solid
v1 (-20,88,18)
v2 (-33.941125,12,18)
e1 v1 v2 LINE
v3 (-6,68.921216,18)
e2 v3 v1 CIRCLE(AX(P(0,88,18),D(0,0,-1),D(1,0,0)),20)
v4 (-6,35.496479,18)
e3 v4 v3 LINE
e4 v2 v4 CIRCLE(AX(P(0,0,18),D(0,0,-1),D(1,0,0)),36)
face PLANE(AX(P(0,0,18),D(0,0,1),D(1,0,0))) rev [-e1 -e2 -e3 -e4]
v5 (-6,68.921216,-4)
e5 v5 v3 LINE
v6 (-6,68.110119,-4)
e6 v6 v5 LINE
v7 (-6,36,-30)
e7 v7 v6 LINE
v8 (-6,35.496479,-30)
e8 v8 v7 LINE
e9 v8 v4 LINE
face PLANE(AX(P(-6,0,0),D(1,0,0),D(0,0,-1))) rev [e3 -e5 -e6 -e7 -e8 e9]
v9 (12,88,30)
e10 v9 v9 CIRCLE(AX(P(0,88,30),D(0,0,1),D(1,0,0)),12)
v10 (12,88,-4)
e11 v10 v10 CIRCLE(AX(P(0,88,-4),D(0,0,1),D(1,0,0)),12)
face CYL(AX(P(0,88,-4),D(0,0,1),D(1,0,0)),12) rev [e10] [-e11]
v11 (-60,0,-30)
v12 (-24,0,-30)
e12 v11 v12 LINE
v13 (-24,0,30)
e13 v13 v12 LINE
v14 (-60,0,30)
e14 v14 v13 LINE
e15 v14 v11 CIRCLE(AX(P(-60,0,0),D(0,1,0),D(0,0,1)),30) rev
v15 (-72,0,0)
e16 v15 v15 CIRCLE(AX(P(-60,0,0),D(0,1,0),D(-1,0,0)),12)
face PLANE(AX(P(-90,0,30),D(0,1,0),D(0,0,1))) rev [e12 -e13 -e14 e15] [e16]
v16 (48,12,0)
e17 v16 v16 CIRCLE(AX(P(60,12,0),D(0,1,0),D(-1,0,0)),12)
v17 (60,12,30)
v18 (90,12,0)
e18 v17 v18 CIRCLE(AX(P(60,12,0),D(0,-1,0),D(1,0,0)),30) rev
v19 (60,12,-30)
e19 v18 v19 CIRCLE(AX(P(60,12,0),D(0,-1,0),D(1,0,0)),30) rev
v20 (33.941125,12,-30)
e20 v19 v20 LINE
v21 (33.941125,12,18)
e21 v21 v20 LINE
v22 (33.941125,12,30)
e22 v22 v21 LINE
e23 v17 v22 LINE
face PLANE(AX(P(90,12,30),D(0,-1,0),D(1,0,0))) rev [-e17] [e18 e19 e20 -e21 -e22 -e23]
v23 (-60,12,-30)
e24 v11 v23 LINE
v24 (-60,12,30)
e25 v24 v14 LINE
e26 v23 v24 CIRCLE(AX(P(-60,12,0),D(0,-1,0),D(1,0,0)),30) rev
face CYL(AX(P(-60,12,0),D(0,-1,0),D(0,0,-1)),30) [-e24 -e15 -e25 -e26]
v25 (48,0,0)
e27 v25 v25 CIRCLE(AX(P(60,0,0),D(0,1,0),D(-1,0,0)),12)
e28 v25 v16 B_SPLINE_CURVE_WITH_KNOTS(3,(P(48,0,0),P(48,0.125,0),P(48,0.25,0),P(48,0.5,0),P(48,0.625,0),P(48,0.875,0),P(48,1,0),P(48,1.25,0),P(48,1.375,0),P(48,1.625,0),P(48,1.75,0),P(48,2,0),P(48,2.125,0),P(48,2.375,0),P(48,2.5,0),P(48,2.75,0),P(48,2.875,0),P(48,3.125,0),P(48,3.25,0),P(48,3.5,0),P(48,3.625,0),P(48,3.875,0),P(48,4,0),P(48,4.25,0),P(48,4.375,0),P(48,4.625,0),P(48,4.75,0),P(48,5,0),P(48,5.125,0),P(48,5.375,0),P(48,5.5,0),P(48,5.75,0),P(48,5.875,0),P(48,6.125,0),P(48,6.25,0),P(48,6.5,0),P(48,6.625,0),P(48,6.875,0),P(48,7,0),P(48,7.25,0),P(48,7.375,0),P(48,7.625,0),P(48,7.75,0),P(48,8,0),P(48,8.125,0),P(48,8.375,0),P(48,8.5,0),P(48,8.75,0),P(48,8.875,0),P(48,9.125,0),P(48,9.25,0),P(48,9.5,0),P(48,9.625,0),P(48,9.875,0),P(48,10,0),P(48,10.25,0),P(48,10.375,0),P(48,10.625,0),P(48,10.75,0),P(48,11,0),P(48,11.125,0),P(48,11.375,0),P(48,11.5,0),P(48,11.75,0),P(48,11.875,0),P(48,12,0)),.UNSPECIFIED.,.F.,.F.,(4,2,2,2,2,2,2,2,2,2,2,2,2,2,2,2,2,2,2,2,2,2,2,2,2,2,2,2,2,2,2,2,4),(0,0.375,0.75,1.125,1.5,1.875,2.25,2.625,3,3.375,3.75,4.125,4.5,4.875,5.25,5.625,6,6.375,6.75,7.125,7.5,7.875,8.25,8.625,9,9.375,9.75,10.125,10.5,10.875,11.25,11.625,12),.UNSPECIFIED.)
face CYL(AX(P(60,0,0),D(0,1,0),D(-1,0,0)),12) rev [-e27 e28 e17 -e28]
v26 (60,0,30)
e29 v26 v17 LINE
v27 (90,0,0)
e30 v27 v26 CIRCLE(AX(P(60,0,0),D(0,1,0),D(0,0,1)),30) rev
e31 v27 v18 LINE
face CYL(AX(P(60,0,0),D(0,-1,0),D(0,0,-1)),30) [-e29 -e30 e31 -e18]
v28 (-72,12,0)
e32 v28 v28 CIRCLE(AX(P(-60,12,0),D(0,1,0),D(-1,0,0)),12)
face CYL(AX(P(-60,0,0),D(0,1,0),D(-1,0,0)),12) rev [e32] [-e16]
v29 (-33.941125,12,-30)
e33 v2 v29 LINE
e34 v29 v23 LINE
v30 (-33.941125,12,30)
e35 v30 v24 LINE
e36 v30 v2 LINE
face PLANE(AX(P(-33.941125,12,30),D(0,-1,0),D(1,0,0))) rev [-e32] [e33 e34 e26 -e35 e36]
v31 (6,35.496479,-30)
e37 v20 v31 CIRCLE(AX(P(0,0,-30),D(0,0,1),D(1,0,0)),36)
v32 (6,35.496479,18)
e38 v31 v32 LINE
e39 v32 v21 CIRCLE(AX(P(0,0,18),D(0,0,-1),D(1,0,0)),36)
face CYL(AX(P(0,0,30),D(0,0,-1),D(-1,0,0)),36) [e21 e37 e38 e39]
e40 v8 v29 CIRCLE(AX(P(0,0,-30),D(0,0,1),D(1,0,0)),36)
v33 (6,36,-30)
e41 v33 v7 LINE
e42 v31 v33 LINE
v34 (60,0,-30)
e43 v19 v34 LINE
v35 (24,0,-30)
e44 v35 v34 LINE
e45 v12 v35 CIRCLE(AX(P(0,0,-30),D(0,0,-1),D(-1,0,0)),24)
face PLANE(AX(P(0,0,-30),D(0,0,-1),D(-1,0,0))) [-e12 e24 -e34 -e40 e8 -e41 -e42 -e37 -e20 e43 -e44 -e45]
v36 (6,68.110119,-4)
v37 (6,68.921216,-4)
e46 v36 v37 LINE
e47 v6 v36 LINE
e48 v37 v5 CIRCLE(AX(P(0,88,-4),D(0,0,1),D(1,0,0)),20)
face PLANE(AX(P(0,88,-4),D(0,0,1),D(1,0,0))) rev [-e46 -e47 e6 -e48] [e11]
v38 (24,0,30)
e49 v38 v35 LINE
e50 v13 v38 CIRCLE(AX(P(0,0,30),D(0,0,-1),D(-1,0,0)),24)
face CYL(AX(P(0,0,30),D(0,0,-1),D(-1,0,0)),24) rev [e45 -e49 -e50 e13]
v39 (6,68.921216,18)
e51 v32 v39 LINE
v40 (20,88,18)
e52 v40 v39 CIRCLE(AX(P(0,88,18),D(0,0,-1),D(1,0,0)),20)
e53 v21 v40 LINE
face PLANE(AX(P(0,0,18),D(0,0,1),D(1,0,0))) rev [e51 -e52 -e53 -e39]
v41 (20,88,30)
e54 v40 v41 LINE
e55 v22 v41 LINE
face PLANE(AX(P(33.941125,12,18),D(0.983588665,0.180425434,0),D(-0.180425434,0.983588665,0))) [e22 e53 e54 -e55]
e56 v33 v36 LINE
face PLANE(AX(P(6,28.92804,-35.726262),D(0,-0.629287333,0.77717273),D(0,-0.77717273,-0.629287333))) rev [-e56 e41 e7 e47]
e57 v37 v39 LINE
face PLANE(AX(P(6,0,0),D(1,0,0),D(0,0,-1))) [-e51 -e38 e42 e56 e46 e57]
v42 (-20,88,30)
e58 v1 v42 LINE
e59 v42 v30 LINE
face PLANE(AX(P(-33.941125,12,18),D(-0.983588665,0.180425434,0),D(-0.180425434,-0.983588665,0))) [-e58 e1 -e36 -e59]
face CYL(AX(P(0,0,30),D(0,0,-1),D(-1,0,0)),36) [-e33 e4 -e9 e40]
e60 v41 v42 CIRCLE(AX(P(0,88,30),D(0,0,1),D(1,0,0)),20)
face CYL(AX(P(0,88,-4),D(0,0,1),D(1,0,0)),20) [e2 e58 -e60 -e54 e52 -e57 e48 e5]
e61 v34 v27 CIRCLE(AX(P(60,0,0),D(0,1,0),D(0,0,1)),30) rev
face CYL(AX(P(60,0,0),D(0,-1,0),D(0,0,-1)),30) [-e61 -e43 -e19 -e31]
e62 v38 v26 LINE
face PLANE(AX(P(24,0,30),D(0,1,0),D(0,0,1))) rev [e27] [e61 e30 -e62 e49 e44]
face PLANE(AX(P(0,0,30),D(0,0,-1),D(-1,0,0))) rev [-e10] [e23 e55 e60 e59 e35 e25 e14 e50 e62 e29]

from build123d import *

# Parameters (mm, degrees)
BOSS_EXTRUDE1_DEPTH = 30
FILLET1_R           = 30
FILLET2_R           = 30
SKETCH5_R           = 12
CUT_EXTRUDE1_DEPTH  = 98.857038582
FILLET3_RADIUS      = 30
FILLET3_LENGTH      = 12
SKETCH6_R           = 12
CUT_EXTRUDE2_DEPTH  = 98.857038582
SKETCH2_R           = 20
SKETCH2_R_2         = 12
BOSS_EXTRUDE2_DEPTH = 34
BOSS_EXTRUDE3_DEPTH = 12
BOSS_EXTRUDE4_DEPTH = 6


with BuildPart() as part:
    # Sketch1 → Boss-Extrude1 (new, symmetric)
    with BuildSketch(Plane.XY):
        with BuildLine():
            Line((-90, 0), (-24, 0))
            ThreePointArc((-24, 0), (0, 24), (24, 0))
            Line((24, 0), (90, 0))
            Line((90, 0), (90, 12))
            Line((90, 12), (33.941125497, 12))
            ThreePointArc((33.941125497, 12), (0, 36), (-33.941125497, 12))
            Line((-33.941125497, 12), (-90, 12))
            Line((-90, 12), (-90, 0))
        make_face()
    extrude(amount=BOSS_EXTRUDE1_DEPTH, both=True)

    # Fillet1
    fillet1_edges = [part.edges().sort_by_distance(p)[0] for p in [
        (90, 6, -30),
    ]]
    fillet(fillet1_edges, radius=FILLET1_R)

    # Fillet2
    fillet2_edges = [part.edges().sort_by_distance(p)[0] for p in [
        (90, 6, 30),
    ]]
    fillet(fillet2_edges, radius=FILLET2_R - 0.0001)  # a hair under: the kernel refuses the full size

    # Sketch5 → Cut-Extrude1 (cut, through all)
    with BuildSketch(Plane(origin=(0, 12, 0), x_dir=(1, 0, 0), z_dir=(0, 1, 0))):
        with Locations(Location((60, 0, 0), (0, 0, 180))):
            Circle(SKETCH5_R)
    extrude(amount=-CUT_EXTRUDE1_DEPTH, mode=Mode.SUBTRACT)

    # Fillet3: full round fillet: the end face becomes a half cylinder, R = half its width
    fillet3_face = Plane((-90, 6, 0), x_dir=(0, -1, 0), z_dir=(-1, 0, 0))  # on the end face: x along it, z out of the body
    fillet3_slab = fillet3_face.offset(-FILLET3_RADIUS / 2) * Box(FILLET3_LENGTH, 2 * FILLET3_RADIUS, FILLET3_RADIUS, mode=Mode.PRIVATE)  # the body's end, R deep
    fillet3_round = Plane((-60, 6, 0), x_dir=(-1, 0, 0), z_dir=(0, -1, 0)) * Cylinder(FILLET3_RADIUS, FILLET3_LENGTH, mode=Mode.PRIVATE)  # its axis R under the face
    add(fillet3_slab - fillet3_round, mode=Mode.SUBTRACT)

    # Sketch6 → Cut-Extrude2 (cut, through all)
    with BuildSketch(Plane(origin=(0, 12, 0), x_dir=(1, 0, 0), z_dir=(0, 1, 0))):
        with Locations(Location((-60, 0, 0), (0, 0, 180))):
            Circle(SKETCH6_R)
    extrude(amount=-CUT_EXTRUDE2_DEPTH, mode=Mode.SUBTRACT)



with BuildPart() as body_2:
    # Sketch2 → Boss-Extrude2 (new body)
    with BuildSketch(Plane.XY.offset(30)):
        with Locations((0, 88)):
            Circle(SKETCH2_R)
        with Locations((0, 88)):
            Circle(SKETCH2_R_2, mode=Mode.SUBTRACT)
    extrude(amount=-BOSS_EXTRUDE2_DEPTH)


with BuildPart() as part_1:
    add(part.part)

    add(body_2.part)  # Boss-Extrude3 merges body 2
    # Sketch3 → Boss-Extrude3 (add)
    with BuildSketch(Plane.XY.offset(30)):
        with BuildLine():
            Line((33.941125497, 12), (20, 88))
            ThreePointArc((20, 88), (0, 68), (-20, 88))
            Line((-20, 88), (-33.941125497, 12))
            ThreePointArc((-33.941125497, 12), (0, 36), (33.941125497, 12))
        make_face()
    extrude(amount=-BOSS_EXTRUDE3_DEPTH)

    # Sketch4 → Boss-Extrude4 (add, symmetric)
    with BuildSketch(Plane(origin=(0, 0, 0), x_dir=(0, 0, -1), z_dir=(1, 0, 0))):
        Polygon((-16.617348449, 30.307571786), (-22.191110534, 30.307571786), (-22.191110534, 71.304305049), (4, 71.304305049), (4, 68.110118748), (30, 36), (30, 30.307571786), align=None)
    extrude(amount=BOSS_EXTRUDE4_DEPTH, both=True)


solid = part_1.part
